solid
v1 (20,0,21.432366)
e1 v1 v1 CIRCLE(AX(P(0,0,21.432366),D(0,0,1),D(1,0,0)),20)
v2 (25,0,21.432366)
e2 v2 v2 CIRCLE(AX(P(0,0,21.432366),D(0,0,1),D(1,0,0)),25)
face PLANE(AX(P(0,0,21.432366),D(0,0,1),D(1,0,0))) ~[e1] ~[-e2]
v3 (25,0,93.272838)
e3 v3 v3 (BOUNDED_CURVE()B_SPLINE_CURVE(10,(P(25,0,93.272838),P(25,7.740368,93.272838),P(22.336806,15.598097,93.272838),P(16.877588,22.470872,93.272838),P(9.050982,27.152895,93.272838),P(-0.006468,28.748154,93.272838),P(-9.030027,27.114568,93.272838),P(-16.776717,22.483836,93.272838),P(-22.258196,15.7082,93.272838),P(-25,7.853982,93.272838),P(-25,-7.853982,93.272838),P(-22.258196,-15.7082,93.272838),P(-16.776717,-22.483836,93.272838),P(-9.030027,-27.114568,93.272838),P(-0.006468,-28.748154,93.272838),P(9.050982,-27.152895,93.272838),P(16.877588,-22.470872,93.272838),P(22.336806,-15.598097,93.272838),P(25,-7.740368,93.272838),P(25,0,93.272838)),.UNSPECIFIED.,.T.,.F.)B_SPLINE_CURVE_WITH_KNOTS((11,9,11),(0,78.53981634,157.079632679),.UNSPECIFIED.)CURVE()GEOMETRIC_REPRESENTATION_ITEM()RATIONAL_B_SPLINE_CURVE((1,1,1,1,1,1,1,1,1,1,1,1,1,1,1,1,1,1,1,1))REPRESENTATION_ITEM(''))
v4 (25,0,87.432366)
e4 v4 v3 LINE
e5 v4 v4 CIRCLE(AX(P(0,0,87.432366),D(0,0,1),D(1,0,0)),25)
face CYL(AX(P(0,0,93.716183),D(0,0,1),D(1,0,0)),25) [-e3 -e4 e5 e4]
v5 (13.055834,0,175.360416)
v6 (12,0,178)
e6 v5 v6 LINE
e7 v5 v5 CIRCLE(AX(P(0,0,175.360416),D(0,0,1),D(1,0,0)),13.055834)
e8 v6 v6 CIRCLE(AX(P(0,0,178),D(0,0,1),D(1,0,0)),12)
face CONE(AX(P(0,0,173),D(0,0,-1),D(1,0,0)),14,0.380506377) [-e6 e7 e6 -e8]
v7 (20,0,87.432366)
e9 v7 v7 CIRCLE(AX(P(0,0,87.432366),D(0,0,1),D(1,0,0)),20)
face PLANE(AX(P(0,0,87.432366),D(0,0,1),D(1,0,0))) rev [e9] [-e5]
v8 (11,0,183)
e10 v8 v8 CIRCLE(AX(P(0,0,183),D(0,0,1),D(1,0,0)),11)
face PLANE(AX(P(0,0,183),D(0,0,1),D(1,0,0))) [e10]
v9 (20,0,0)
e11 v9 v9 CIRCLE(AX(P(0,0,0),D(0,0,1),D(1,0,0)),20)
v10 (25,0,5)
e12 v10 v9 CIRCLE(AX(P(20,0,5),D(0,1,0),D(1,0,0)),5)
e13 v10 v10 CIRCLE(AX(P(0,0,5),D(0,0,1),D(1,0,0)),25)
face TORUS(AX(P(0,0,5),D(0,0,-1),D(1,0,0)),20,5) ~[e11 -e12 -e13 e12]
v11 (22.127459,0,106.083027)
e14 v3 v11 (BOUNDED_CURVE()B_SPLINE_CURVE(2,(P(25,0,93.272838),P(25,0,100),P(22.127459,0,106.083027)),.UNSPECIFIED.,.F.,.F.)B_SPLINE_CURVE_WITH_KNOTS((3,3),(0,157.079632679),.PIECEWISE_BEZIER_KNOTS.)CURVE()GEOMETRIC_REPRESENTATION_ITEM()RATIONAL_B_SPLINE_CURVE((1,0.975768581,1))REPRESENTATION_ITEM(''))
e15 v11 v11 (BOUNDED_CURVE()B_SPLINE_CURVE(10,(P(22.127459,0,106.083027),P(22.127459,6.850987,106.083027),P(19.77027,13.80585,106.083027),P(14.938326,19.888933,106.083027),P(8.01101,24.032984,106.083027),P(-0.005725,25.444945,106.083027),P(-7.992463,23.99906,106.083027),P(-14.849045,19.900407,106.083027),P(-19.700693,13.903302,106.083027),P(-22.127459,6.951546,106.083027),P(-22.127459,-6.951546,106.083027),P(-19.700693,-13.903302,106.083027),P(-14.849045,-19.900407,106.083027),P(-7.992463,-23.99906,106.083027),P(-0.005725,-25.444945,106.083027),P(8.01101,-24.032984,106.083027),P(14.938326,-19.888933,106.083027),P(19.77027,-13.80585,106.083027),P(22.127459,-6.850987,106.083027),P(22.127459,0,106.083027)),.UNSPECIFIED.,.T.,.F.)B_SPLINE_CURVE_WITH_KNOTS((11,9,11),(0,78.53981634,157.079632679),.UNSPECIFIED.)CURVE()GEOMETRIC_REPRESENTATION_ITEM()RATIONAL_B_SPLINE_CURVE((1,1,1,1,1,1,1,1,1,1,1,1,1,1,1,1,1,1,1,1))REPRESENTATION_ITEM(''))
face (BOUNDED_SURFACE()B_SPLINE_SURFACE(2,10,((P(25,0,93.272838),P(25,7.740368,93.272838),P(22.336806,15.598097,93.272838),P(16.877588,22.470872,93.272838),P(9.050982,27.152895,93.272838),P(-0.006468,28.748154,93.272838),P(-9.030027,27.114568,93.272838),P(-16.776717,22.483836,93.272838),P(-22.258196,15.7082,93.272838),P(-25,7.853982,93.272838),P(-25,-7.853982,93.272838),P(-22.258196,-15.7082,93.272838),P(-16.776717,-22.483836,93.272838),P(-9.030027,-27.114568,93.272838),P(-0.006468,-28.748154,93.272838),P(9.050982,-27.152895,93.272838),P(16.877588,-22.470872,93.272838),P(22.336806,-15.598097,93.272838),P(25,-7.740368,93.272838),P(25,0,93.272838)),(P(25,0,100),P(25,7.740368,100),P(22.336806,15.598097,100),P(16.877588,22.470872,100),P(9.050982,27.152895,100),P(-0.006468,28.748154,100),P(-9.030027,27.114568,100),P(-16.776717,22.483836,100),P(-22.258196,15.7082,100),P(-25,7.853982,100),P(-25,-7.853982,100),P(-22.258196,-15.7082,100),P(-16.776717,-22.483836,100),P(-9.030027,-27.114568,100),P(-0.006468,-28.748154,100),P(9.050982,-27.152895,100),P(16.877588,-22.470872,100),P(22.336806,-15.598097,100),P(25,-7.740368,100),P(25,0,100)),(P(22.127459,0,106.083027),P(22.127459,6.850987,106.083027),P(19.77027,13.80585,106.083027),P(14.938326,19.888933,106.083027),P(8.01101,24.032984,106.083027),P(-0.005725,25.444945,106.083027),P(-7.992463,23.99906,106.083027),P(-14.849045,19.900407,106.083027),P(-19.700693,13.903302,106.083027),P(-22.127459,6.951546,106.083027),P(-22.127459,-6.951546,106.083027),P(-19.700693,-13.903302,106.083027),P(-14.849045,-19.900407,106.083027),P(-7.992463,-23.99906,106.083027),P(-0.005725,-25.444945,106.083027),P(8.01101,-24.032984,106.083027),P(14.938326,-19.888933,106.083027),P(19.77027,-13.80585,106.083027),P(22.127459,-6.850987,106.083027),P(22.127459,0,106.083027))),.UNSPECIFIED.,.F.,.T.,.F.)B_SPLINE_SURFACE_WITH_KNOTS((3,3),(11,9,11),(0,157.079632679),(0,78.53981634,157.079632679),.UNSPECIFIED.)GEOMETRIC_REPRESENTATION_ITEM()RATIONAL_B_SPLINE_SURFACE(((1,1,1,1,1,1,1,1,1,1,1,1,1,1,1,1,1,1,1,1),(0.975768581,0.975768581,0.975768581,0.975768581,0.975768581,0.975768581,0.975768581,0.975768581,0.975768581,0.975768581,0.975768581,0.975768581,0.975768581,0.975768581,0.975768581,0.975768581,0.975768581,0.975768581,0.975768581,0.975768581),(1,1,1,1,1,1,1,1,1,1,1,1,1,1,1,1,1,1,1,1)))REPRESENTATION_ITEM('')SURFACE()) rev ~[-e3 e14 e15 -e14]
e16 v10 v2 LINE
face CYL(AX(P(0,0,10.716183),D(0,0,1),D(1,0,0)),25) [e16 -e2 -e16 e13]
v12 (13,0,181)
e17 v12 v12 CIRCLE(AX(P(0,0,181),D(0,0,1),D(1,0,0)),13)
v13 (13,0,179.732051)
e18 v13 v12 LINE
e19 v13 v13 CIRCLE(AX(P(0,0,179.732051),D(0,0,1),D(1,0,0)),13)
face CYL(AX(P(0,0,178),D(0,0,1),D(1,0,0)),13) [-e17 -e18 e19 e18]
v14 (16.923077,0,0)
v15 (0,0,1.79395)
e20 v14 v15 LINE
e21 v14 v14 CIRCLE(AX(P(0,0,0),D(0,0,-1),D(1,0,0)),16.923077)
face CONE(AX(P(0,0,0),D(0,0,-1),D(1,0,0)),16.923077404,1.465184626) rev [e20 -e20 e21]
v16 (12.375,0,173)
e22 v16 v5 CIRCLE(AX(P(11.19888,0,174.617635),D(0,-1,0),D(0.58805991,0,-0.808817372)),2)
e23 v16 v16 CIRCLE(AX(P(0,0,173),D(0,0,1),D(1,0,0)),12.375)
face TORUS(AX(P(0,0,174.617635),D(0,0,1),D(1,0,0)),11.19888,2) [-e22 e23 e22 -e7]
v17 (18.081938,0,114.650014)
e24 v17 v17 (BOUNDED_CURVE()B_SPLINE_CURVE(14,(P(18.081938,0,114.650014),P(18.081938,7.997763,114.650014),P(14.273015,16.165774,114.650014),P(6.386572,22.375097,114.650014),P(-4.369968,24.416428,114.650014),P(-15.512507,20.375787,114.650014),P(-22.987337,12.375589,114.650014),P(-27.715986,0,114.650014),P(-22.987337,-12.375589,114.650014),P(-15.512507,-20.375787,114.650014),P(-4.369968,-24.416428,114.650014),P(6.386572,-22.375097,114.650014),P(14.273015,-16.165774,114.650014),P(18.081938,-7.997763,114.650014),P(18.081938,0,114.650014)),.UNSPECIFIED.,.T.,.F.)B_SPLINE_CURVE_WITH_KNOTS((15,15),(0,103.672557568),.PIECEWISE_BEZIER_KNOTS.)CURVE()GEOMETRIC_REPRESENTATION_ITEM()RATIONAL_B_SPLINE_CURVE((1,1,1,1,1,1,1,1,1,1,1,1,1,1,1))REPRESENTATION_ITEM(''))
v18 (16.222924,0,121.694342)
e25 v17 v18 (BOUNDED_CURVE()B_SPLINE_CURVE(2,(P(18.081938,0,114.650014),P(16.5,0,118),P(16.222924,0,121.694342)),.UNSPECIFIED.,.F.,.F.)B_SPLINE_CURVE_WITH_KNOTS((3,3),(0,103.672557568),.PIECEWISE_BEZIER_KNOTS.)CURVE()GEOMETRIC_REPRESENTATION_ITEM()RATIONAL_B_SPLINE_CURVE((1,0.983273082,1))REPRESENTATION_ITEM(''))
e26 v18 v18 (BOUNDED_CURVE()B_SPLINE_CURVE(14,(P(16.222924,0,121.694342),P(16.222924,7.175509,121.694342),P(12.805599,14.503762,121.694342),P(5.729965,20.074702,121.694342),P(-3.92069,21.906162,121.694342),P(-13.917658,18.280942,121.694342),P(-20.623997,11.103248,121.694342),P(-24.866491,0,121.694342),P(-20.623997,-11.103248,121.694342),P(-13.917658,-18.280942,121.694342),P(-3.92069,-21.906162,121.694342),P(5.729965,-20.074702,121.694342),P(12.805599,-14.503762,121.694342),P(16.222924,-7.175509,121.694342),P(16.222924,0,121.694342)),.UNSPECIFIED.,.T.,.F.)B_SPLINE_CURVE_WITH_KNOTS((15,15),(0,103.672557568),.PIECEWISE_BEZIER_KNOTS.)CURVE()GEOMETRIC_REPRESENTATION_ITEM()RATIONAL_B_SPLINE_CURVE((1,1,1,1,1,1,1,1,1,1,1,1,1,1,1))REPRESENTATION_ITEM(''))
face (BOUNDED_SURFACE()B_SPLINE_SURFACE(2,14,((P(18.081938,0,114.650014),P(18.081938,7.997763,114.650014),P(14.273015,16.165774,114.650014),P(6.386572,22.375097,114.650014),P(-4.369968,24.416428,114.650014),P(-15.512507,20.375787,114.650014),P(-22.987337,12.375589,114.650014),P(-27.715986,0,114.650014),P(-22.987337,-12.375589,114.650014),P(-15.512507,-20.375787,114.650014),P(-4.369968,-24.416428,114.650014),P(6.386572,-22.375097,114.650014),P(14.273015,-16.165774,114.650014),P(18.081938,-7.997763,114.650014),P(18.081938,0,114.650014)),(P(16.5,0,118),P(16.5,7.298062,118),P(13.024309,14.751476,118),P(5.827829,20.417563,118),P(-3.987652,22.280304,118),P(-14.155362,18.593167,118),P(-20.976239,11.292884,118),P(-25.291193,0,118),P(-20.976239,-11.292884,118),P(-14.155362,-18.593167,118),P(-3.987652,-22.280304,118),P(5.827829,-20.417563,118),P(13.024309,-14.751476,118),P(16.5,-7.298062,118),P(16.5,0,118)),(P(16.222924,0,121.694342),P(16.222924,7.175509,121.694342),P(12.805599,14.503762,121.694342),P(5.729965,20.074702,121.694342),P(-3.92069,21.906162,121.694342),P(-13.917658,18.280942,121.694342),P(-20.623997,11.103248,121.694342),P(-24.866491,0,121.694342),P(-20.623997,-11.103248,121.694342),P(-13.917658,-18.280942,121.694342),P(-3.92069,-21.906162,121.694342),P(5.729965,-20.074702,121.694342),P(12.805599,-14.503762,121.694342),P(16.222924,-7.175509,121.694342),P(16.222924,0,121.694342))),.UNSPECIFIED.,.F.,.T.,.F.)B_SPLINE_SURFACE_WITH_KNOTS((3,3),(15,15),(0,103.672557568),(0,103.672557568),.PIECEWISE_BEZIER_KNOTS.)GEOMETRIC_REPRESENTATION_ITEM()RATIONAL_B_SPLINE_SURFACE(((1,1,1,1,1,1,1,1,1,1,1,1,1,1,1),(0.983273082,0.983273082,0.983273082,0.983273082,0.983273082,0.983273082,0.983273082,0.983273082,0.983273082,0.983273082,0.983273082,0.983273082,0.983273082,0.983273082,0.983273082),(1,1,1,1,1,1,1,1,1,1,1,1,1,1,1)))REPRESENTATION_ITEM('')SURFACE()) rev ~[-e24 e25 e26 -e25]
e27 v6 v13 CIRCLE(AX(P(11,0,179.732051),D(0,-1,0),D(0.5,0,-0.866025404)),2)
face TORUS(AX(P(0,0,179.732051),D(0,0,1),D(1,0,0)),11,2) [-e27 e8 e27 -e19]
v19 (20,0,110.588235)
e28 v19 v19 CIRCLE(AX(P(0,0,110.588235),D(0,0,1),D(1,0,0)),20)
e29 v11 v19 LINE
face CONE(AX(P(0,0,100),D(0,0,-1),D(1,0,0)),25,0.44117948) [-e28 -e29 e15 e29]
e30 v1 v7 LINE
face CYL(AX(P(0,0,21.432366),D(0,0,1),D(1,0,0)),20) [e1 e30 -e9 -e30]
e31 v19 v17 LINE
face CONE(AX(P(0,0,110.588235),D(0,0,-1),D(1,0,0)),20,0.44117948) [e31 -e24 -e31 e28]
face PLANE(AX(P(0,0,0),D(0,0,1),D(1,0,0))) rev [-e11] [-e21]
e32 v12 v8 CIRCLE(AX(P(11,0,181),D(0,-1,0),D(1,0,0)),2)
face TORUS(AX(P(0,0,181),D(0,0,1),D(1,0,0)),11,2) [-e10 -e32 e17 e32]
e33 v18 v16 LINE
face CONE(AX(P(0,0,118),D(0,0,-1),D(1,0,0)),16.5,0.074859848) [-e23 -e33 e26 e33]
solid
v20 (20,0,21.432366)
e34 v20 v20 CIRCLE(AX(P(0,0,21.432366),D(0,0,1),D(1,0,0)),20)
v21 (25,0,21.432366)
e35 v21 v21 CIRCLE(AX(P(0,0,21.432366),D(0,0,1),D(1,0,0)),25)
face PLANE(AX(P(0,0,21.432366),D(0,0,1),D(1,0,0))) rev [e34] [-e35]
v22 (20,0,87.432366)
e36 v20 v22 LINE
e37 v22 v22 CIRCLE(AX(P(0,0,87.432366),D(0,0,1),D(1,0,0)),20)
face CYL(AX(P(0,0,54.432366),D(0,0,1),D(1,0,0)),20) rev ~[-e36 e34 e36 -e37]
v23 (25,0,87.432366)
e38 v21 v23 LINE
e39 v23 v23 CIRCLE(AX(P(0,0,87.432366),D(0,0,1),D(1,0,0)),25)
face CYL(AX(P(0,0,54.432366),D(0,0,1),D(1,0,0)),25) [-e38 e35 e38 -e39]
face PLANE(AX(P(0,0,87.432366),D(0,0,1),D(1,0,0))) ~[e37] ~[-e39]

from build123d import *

# Parameters (mm, degrees)
F0_W   = 5
F0_H   = 21.4323662221
F0_W_2 = 12
F0_H_2 = 55
F0_H_3 = 5
F0_H_4 = 12.5676337779
F3_R   = 30
F4_R   = 20
F5_R   = 5
F0_H_5 = 66


# Not quite as in the source:
# - a fillet or chamfer that OpenCascade refuses, or shapes differently, is made with other operations: its cross-section is extruded or revolved along the edge and cut away or added


with BuildPart() as f1:
    # F0 (on Front) → F1 (revolve)
    with BuildSketch(Plane.XZ):
        with Locations((22.5, 10.7161831111)):
            Rectangle(F0_W, F0_H)
        Polygon((0, 118), (0, 0), (20, 0), (20, 21.4323662221), (20, 87.4323662221), (20, 100), (20, 110.5882352941), (16.5, 118), (12, 118), align=None)
        Polygon((20, 110.5882352941), (20, 100), (25, 100), align=None)
        Polygon((12, 173), (12, 118), (16.5, 118), (12.375, 173), align=None)
        with Locations((6, 145.5)):
            Rectangle(F0_W_2, F0_H_2)
        with Locations((6, 175.5)):
            Rectangle(F0_W_2, F0_H_3)
        Polygon((12, 178), (12, 173), (12.375, 173), align=None)
        Polygon((12, 178), (12.375, 173), (14, 173), align=None)
        Polygon((0, 183), (0, 178), (12, 178), (13, 178), (13, 183), align=None)
        with Locations((22.5, 93.7161831111)):
            Rectangle(F0_W, F0_H_4)
    revolve(axis=Axis((0, 0, 148), (0, 0, 1)))

    # F2: fillet of radius 2 on 3 edges, made by hand

    # F2_s1 → F2_t2 (revolve, cut)
    with BuildSketch(Plane.XZ):
        with BuildLine():
            ThreePointArc((13, 181), (12.4142135624, 182.4142135624), (11, 183))
            Line((11, 183), (11, 183.04))
            Line((11, 183.04), (13.04, 183.04))
            Line((13.04, 183.04), (13.04, 181))
            Line((13.04, 181), (13, 181))
        make_face()
    revolve(axis=Axis((0, 0, 183), (0, 0, 1)), mode=Mode.SUBTRACT)

    # F2_s3 → F2_t4 (revolve, cut)
    with BuildSketch(Plane.XZ):
        with BuildLine():
            ThreePointArc((12.375, 173), (13.1205394366, 174.0633553036), (13.055833561, 175.3604160974))
            Line((13.055833561, 175.3604160974), (13.0929726287, 175.3752717245))
            Line((13.0929726287, 175.3752717245), (14.0371390676, 173.0148556271))
            Line((14.0371390676, 173.0148556271), (14, 172.96))
            ThreePointArc((14, 172.96), (13.1875, 172.96), (12.3985223964, 172.9676473051))
            Line((12.3985223964, 172.9676473051), (12.375, 173))
        make_face()
    revolve(axis=Axis((0, 0, 173), (0, 0, 1)), mode=Mode.SUBTRACT)

    # F2_s5 → F2_t6 (revolve, cut)
    with BuildSketch(Plane.XZ):
        with BuildLine():
            ThreePointArc((12, 178), (12.7320508076, 178.7320508076), (13, 179.7320508076))
            Line((13, 179.7320508076), (13.04, 179.7320508076))
            Line((13.04, 179.7320508076), (13.04, 178))
            Line((13.04, 178), (13, 177.96))
            ThreePointArc((13, 177.96), (12.5, 177.96), (12.02, 177.9653589838))
            Line((12.02, 177.9653589838), (12, 178))
        make_face()
    revolve(axis=Axis((0, 0, 178), (0, 0, 1)), mode=Mode.SUBTRACT)

    # F3
    f3_edges = [f1.edges().sort_by_distance(p)[0] for p in [
        (-25, 0, 100),
    ]]
    fillet(f3_edges, radius=F3_R)

    # F4
    f4_edges = [f1.edges().sort_by_distance(p)[0] for p in [
        (-16.5, 0, 118),
    ]]
    fillet(f4_edges, radius=F4_R)

    # F5
    f5_edges = [f1.edges().sort_by_distance(p)[0] for p in [
        (-25, 0, 0),
    ]]
    fillet(f5_edges, radius=F5_R)

    # F6 (on Front) → F7 (revolve, cut)
    with BuildSketch(Plane.XZ):
        Polygon((0, 1.7939497484), (0, 0), (16.9230774045, 0), align=None)
    revolve(axis=Axis((0, 0, 0.8969748742), (0, 0, -1)), mode=Mode.SUBTRACT)


with BuildPart() as f8:
    # F0 (on Front) → F8 (revolve)
    with BuildSketch(Plane.XZ):
        with Locations((22.5, 54.4323662221)):
            Rectangle(F0_W, F0_H_5)
    revolve(axis=Axis((0, 0, 59), (0, 0, 1)))


solid = Compound([f1.part, f8.part])
